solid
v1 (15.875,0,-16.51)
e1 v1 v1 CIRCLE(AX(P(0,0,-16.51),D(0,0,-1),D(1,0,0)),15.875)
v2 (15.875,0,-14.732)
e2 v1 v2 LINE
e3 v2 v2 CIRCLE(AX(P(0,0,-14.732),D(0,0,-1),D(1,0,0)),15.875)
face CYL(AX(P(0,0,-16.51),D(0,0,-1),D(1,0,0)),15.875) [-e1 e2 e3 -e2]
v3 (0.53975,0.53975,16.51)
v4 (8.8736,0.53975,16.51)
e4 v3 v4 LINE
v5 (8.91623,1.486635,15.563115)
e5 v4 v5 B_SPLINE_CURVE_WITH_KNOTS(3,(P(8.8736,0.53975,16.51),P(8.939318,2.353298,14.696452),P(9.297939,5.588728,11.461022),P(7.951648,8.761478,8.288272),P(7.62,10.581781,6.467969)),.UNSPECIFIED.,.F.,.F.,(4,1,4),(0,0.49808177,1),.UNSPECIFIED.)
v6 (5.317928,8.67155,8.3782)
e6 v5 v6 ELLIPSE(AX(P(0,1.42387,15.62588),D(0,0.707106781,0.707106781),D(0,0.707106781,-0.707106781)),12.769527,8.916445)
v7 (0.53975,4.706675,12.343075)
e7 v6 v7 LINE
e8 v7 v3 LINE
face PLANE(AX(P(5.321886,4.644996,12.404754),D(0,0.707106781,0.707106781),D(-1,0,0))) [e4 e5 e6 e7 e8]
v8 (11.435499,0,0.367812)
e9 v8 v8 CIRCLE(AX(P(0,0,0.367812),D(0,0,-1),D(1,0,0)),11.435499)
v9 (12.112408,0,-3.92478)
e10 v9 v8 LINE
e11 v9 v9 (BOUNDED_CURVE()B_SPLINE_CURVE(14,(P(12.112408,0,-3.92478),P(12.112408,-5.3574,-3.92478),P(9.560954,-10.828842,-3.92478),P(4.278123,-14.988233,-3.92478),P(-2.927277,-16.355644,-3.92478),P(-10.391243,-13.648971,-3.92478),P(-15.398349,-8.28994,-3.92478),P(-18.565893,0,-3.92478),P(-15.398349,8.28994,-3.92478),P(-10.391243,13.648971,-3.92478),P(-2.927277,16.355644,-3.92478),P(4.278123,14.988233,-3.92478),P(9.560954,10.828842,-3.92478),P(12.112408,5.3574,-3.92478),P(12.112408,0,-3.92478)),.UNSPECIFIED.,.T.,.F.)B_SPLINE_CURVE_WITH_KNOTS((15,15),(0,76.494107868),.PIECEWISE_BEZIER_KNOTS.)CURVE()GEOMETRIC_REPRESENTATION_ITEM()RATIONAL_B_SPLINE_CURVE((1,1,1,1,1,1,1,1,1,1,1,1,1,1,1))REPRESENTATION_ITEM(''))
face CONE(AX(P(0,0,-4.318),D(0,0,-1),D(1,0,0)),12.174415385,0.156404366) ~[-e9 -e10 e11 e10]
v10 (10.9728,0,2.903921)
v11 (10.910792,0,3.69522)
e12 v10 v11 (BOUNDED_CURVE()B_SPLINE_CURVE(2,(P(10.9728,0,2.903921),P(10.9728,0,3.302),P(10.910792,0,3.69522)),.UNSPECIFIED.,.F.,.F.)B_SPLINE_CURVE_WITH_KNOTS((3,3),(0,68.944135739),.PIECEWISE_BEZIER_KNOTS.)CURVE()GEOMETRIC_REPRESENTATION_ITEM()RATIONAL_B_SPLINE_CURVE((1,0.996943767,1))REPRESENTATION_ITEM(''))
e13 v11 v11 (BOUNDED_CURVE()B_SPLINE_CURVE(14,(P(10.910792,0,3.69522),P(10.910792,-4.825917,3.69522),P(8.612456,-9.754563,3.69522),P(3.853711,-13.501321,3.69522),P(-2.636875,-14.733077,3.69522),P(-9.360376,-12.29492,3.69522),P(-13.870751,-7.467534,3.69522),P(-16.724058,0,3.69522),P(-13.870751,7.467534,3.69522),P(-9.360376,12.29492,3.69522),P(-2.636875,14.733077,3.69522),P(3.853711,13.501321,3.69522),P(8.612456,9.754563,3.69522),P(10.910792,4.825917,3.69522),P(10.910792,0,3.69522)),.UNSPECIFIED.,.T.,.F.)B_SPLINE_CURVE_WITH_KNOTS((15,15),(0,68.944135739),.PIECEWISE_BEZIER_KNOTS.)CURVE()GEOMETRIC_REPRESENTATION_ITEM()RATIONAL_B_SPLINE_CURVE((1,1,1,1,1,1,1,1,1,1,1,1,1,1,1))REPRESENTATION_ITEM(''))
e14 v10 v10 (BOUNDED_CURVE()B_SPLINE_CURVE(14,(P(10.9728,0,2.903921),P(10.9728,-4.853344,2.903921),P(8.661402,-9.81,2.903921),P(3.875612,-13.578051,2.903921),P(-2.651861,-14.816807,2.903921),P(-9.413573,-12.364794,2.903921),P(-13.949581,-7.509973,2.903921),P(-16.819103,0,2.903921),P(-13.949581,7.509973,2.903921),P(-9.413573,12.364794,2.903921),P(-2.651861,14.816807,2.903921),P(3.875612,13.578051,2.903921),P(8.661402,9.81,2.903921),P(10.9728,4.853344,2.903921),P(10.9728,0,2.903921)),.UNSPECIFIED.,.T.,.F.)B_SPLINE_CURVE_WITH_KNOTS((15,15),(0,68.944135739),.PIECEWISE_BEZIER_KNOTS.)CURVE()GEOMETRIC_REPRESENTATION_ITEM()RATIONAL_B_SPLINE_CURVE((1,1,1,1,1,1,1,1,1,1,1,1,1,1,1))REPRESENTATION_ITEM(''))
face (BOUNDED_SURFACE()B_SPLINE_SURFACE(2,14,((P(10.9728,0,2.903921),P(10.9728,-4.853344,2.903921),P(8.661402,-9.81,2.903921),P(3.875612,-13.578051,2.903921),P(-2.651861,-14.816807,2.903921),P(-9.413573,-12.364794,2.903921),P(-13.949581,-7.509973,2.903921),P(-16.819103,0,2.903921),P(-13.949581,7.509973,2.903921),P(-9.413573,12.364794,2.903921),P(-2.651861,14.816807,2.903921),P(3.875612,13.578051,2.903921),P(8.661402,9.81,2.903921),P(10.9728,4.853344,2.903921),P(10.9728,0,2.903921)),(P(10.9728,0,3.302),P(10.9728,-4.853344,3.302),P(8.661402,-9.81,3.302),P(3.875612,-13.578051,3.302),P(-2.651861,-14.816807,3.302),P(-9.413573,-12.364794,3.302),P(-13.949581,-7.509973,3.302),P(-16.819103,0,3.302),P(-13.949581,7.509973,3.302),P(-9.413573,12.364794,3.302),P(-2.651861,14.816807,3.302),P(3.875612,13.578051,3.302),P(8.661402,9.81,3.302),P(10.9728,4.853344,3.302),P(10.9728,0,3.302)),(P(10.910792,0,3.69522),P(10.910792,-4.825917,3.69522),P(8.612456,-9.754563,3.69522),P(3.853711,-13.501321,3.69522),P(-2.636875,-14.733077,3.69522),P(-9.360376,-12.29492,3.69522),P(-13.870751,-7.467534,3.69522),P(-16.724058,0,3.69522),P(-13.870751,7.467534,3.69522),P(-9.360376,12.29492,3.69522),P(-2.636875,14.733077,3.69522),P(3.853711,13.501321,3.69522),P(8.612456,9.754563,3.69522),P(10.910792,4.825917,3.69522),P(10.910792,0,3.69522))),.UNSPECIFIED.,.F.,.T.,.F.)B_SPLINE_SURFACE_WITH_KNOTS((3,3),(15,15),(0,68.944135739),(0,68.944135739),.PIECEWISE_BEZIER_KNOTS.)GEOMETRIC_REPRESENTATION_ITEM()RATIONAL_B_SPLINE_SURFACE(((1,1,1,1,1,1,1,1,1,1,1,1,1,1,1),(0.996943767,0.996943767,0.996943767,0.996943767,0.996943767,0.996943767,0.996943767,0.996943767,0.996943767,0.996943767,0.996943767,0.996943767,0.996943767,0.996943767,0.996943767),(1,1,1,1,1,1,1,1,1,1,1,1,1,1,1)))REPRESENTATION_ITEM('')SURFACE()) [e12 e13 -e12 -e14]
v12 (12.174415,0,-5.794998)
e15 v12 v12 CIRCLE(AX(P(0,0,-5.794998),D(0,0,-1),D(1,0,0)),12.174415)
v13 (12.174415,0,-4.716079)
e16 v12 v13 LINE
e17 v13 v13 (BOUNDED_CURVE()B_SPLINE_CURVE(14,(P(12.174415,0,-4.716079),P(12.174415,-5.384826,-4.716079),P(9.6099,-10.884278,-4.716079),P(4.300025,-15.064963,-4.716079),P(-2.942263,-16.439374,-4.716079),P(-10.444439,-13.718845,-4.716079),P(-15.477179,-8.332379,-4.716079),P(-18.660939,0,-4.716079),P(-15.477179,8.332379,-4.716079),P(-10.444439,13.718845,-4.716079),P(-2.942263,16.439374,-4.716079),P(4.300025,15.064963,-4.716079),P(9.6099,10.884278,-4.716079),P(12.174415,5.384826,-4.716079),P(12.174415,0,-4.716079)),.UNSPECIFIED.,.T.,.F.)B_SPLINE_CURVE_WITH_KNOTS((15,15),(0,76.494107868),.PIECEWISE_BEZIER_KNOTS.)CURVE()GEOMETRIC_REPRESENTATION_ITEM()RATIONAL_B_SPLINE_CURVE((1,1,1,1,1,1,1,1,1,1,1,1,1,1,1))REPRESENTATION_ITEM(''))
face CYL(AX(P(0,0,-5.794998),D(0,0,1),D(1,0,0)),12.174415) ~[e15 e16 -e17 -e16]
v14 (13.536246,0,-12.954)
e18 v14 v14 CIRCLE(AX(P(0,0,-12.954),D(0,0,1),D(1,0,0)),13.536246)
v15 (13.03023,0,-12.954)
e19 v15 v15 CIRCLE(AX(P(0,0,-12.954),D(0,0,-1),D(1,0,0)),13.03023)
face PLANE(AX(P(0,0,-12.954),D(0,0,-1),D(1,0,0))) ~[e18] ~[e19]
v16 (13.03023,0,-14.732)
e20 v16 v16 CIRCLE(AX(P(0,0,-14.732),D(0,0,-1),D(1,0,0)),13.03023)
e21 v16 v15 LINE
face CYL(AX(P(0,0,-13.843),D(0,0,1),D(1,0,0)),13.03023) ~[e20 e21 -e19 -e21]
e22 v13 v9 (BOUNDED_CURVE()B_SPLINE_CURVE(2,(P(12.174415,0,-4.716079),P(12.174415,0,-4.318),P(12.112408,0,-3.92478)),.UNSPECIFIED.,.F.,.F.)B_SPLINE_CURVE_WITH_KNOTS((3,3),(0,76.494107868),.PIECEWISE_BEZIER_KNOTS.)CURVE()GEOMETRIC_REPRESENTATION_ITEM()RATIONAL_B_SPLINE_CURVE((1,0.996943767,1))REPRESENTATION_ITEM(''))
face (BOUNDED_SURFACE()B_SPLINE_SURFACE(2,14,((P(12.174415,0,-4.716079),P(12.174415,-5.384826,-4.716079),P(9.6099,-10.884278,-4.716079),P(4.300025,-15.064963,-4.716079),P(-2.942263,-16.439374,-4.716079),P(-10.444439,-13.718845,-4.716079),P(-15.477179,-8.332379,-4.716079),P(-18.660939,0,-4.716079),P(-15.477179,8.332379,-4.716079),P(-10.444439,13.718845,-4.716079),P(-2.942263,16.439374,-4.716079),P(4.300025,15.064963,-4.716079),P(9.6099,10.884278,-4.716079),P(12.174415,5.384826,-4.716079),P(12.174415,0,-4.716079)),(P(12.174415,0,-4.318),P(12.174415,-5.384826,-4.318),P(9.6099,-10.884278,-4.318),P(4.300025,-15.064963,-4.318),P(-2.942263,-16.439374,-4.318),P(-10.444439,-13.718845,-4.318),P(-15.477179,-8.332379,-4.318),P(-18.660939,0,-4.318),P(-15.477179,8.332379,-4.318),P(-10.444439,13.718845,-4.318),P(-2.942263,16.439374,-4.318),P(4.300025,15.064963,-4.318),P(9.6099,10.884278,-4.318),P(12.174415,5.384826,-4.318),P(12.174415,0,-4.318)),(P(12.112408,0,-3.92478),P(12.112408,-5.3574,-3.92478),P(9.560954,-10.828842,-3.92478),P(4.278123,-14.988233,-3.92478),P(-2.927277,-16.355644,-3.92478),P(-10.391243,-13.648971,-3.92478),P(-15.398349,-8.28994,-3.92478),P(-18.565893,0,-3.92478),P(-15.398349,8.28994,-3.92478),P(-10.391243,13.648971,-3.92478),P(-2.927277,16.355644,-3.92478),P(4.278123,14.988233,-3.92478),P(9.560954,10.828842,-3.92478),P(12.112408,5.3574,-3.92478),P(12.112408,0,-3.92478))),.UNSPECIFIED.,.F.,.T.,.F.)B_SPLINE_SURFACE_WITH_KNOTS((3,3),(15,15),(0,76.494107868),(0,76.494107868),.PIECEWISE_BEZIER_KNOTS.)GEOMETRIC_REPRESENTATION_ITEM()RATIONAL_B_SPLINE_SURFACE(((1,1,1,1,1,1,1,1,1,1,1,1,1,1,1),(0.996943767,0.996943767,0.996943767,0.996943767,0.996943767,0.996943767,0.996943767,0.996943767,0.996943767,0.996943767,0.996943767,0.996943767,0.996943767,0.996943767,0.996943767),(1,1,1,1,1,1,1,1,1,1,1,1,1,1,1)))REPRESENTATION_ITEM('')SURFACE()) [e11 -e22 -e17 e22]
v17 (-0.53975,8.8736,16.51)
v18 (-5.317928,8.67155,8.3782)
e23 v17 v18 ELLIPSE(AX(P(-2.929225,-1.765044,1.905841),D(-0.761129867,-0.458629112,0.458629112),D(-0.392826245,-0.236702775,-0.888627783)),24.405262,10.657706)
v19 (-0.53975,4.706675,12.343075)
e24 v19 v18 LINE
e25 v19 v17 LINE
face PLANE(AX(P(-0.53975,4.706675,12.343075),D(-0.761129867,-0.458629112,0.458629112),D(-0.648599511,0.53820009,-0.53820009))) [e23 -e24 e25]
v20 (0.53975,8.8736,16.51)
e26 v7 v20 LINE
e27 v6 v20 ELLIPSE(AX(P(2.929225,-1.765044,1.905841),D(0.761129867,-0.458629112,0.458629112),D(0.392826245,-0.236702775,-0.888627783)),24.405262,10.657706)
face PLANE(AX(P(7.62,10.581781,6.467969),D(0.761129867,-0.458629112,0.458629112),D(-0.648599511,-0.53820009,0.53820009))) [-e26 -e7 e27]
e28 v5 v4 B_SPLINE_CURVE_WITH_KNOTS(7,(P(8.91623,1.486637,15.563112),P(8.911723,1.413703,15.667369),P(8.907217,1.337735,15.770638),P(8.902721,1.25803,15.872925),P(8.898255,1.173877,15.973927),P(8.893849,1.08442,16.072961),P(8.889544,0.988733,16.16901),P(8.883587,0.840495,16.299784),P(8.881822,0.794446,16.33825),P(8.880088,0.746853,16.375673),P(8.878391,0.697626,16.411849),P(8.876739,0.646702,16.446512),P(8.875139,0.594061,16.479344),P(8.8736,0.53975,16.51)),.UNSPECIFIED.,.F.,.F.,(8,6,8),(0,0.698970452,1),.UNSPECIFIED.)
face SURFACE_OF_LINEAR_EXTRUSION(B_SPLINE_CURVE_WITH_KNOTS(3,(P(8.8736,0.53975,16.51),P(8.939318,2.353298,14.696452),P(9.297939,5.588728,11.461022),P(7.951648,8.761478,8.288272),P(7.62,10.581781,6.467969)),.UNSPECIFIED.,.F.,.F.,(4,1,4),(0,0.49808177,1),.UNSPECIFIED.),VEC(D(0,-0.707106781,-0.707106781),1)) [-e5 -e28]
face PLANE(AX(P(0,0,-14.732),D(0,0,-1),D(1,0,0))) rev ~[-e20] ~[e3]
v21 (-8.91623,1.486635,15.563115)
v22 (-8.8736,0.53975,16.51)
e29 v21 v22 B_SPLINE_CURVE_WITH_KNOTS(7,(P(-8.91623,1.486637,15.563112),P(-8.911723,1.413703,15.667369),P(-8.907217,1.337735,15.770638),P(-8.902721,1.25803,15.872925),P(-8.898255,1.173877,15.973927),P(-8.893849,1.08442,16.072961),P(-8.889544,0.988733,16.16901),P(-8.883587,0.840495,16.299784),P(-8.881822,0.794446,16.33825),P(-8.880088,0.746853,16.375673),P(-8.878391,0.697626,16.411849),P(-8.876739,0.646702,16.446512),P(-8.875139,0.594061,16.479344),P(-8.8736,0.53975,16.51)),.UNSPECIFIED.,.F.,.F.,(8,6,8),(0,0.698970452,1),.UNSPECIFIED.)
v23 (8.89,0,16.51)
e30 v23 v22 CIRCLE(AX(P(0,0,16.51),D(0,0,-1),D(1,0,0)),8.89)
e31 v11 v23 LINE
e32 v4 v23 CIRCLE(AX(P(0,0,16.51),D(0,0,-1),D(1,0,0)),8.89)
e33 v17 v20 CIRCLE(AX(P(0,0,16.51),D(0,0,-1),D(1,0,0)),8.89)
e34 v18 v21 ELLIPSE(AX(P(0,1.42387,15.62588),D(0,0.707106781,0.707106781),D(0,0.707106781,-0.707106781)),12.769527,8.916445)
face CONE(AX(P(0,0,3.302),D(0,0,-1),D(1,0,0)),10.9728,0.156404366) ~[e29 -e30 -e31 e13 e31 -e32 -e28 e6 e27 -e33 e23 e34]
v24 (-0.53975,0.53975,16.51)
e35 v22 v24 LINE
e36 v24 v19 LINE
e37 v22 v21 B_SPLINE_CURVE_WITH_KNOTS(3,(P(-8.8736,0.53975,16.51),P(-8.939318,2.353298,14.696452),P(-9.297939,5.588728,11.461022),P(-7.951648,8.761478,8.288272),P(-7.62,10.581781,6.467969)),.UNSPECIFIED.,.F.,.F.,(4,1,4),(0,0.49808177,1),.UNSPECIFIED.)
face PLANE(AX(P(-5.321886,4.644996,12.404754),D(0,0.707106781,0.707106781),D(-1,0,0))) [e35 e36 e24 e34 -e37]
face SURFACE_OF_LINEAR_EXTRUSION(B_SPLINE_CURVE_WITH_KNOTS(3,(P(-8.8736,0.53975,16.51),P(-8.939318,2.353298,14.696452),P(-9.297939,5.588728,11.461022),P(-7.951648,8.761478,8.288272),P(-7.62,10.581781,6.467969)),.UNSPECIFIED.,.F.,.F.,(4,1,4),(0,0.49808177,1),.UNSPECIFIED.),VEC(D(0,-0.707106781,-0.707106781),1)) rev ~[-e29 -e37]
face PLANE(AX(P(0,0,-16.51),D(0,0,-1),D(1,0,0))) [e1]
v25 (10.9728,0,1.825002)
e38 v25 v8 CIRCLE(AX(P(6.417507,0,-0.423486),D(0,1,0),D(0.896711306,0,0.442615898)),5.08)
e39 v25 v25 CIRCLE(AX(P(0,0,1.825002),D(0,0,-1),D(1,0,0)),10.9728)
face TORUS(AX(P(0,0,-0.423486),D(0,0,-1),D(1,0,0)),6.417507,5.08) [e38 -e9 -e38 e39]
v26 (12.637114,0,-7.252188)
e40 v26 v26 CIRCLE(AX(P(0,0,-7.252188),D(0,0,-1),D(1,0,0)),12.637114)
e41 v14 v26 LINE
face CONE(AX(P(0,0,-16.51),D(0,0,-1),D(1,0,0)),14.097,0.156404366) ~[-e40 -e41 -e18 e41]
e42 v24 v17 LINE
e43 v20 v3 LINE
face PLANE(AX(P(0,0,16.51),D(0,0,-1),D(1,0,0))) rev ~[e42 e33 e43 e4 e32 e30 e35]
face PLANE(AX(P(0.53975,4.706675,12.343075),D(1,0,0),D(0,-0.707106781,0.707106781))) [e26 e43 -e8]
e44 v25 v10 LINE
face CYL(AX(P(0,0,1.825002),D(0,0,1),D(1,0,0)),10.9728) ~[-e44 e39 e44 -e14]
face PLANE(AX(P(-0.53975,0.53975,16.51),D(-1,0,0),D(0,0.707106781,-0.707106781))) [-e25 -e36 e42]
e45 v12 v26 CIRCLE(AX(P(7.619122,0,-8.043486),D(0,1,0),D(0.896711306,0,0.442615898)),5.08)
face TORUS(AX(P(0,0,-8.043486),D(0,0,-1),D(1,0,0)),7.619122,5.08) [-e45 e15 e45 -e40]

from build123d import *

# Parameters (mm, degrees)
F2_R      = 15.875
F3_DEPTH  = 1.778
F4_W      = 0.889
F4_H      = 1.778
F6_R      = 5.08
F12_DEPTH = 25.4


# Not quite as in the source:
# - a fillet or chamfer that OpenCascade refuses, or shapes differently, is made with other operations: its cross-section is extruded or revolved along the edge and cut away or added


with BuildPart() as f1:
    # F0 (on Front) → F1 (revolve)
    with BuildSketch(Plane.XZ):
        Polygon((8.89, 16.51), (0, 16.51), (0, 3.302), (10.9728, 3.302), align=None)
        Polygon((10.9728, 3.302), (0, 3.302), (0, 1.27), (11.2932307692, 1.27), (10.9728, 1.8250023726), align=None)
        Polygon((11.2932307692, 1.27), (0, 1.27), (0, -4.318), (12.1744153846, -4.318), align=None)
        Polygon((12.1744153846, -4.318), (0, -4.318), (0, -6.35), (12.4948461538, -6.35), (12.1744153846, -5.7949976274), align=None)
        Polygon((12.4948461538, -6.35), (0, -6.35), (0, -16.51), (14.097, -16.51), align=None)
    revolve(axis=Axis((0, 0, 0), (0, 0, -1)))

    # F2 (on face) → F3 (join)
    with BuildSketch(Plane(origin=(0, 0, -16.51), x_dir=(1, 0, 0), z_dir=(0, 0, -1))):
        Circle(F2_R)
    extrude(amount=-F3_DEPTH)

    # F4 (on Front) → F5 (revolve, cut)
    with BuildSketch(Plane.XZ):
        with Locations((13.4747296192, -13.843)):
            Rectangle(F4_W, F4_H)
    revolve(axis=Axis((0, 0, -8.2004386932), (0, 0, -1)), mode=Mode.SUBTRACT)

    # F6
    f6_edges = [f1.edges().sort_by_distance(p)[0] for p in [
        (-12.174415, 0, -4.318),
        (-10.9728, 0, 3.302),
    ]]
    fillet(f6_edges, radius=F6_R)

    # F7: fillet of radius 5.08 on 2 edges, made by hand

    # F7_s1 → F7_t2 (revolve, cut)
    with BuildSketch(Plane.XZ):
        with BuildLine():
            ThreePointArc((10.9728, 1.8250023726), (11.259283136, 1.1139138917), (11.4354988153, 0.367812391))
            Line((11.4354988153, 0.367812391), (11.2932307692, 1.27))
            Line((11.2932307692, 1.27), (10.9728, 1.8250023726))
        make_face()
    revolve(axis=Axis((0, 0, 1.27), (0, 0, -1)), mode=Mode.SUBTRACT)

    # F7_s3 → F7_t4 (revolve, cut)
    with BuildSketch(Plane.XZ):
        with BuildLine():
            ThreePointArc((12.1744153846, -5.7949976274), (12.4608985206, -6.5060861083), (12.6371141999, -7.252187609))
            Line((12.6371141999, -7.252187609), (12.4948461538, -6.35))
            Line((12.4948461538, -6.35), (12.1744153846, -5.7949976274))
        make_face()
    revolve(axis=Axis((0, 0, -6.35), (0, 0, -1)), mode=Mode.SUBTRACT)

    # F11 (on line) → F12 (cut)
    with BuildSketch(Plane(origin=(0, 8.524875, 8.524875), x_dir=(-1, 0, 0), z_dir=(0, 0.7071067812, 0.7071067812))):
        with BuildLine():
            Line((8.8735996043, 11.2926720722), (0.53975, 11.2926720722))
            Line((0.53975, 11.2926720722), (0.53975, 5.3997505037))
            Line((0.53975, 5.3997505037), (7.62, -2.9089047656))
            add(Edge.make_bspline(
                [(8.8735996043, 11.2926720722), (8.9393181622, 8.7279276849), (9.2979393658, 4.1523383564), (7.9516483041, -0.3346072044), (7.62, -2.9089047656)],
                knots=[0, 0, 0, 0, 0.4980817697, 1, 1, 1, 1], degree=3))
        make_face()
        with BuildLine():
            Line((-0.53975, 5.3997505037), (-0.53975, 11.2926720722))
            Line((-0.53975, 11.2926720722), (-8.8735996043, 11.2926720722))
            add(Edge.make_bspline(
                [(-8.8735996043, 11.2926720722), (-8.9393181622, 8.7279276849), (-9.2979393658, 4.1523383564), (-7.9516483041, -0.3346072044), (-7.62, -2.9089047656)],
                knots=[0, 0, 0, 0, 0.4980817697, 1, 1, 1, 1], degree=3))
            Line((-7.62, -2.9089047656), (-0.53975, 5.3997505037))
        make_face()
    extrude(amount=F12_DEPTH, mode=Mode.SUBTRACT)


solid = f1.part
